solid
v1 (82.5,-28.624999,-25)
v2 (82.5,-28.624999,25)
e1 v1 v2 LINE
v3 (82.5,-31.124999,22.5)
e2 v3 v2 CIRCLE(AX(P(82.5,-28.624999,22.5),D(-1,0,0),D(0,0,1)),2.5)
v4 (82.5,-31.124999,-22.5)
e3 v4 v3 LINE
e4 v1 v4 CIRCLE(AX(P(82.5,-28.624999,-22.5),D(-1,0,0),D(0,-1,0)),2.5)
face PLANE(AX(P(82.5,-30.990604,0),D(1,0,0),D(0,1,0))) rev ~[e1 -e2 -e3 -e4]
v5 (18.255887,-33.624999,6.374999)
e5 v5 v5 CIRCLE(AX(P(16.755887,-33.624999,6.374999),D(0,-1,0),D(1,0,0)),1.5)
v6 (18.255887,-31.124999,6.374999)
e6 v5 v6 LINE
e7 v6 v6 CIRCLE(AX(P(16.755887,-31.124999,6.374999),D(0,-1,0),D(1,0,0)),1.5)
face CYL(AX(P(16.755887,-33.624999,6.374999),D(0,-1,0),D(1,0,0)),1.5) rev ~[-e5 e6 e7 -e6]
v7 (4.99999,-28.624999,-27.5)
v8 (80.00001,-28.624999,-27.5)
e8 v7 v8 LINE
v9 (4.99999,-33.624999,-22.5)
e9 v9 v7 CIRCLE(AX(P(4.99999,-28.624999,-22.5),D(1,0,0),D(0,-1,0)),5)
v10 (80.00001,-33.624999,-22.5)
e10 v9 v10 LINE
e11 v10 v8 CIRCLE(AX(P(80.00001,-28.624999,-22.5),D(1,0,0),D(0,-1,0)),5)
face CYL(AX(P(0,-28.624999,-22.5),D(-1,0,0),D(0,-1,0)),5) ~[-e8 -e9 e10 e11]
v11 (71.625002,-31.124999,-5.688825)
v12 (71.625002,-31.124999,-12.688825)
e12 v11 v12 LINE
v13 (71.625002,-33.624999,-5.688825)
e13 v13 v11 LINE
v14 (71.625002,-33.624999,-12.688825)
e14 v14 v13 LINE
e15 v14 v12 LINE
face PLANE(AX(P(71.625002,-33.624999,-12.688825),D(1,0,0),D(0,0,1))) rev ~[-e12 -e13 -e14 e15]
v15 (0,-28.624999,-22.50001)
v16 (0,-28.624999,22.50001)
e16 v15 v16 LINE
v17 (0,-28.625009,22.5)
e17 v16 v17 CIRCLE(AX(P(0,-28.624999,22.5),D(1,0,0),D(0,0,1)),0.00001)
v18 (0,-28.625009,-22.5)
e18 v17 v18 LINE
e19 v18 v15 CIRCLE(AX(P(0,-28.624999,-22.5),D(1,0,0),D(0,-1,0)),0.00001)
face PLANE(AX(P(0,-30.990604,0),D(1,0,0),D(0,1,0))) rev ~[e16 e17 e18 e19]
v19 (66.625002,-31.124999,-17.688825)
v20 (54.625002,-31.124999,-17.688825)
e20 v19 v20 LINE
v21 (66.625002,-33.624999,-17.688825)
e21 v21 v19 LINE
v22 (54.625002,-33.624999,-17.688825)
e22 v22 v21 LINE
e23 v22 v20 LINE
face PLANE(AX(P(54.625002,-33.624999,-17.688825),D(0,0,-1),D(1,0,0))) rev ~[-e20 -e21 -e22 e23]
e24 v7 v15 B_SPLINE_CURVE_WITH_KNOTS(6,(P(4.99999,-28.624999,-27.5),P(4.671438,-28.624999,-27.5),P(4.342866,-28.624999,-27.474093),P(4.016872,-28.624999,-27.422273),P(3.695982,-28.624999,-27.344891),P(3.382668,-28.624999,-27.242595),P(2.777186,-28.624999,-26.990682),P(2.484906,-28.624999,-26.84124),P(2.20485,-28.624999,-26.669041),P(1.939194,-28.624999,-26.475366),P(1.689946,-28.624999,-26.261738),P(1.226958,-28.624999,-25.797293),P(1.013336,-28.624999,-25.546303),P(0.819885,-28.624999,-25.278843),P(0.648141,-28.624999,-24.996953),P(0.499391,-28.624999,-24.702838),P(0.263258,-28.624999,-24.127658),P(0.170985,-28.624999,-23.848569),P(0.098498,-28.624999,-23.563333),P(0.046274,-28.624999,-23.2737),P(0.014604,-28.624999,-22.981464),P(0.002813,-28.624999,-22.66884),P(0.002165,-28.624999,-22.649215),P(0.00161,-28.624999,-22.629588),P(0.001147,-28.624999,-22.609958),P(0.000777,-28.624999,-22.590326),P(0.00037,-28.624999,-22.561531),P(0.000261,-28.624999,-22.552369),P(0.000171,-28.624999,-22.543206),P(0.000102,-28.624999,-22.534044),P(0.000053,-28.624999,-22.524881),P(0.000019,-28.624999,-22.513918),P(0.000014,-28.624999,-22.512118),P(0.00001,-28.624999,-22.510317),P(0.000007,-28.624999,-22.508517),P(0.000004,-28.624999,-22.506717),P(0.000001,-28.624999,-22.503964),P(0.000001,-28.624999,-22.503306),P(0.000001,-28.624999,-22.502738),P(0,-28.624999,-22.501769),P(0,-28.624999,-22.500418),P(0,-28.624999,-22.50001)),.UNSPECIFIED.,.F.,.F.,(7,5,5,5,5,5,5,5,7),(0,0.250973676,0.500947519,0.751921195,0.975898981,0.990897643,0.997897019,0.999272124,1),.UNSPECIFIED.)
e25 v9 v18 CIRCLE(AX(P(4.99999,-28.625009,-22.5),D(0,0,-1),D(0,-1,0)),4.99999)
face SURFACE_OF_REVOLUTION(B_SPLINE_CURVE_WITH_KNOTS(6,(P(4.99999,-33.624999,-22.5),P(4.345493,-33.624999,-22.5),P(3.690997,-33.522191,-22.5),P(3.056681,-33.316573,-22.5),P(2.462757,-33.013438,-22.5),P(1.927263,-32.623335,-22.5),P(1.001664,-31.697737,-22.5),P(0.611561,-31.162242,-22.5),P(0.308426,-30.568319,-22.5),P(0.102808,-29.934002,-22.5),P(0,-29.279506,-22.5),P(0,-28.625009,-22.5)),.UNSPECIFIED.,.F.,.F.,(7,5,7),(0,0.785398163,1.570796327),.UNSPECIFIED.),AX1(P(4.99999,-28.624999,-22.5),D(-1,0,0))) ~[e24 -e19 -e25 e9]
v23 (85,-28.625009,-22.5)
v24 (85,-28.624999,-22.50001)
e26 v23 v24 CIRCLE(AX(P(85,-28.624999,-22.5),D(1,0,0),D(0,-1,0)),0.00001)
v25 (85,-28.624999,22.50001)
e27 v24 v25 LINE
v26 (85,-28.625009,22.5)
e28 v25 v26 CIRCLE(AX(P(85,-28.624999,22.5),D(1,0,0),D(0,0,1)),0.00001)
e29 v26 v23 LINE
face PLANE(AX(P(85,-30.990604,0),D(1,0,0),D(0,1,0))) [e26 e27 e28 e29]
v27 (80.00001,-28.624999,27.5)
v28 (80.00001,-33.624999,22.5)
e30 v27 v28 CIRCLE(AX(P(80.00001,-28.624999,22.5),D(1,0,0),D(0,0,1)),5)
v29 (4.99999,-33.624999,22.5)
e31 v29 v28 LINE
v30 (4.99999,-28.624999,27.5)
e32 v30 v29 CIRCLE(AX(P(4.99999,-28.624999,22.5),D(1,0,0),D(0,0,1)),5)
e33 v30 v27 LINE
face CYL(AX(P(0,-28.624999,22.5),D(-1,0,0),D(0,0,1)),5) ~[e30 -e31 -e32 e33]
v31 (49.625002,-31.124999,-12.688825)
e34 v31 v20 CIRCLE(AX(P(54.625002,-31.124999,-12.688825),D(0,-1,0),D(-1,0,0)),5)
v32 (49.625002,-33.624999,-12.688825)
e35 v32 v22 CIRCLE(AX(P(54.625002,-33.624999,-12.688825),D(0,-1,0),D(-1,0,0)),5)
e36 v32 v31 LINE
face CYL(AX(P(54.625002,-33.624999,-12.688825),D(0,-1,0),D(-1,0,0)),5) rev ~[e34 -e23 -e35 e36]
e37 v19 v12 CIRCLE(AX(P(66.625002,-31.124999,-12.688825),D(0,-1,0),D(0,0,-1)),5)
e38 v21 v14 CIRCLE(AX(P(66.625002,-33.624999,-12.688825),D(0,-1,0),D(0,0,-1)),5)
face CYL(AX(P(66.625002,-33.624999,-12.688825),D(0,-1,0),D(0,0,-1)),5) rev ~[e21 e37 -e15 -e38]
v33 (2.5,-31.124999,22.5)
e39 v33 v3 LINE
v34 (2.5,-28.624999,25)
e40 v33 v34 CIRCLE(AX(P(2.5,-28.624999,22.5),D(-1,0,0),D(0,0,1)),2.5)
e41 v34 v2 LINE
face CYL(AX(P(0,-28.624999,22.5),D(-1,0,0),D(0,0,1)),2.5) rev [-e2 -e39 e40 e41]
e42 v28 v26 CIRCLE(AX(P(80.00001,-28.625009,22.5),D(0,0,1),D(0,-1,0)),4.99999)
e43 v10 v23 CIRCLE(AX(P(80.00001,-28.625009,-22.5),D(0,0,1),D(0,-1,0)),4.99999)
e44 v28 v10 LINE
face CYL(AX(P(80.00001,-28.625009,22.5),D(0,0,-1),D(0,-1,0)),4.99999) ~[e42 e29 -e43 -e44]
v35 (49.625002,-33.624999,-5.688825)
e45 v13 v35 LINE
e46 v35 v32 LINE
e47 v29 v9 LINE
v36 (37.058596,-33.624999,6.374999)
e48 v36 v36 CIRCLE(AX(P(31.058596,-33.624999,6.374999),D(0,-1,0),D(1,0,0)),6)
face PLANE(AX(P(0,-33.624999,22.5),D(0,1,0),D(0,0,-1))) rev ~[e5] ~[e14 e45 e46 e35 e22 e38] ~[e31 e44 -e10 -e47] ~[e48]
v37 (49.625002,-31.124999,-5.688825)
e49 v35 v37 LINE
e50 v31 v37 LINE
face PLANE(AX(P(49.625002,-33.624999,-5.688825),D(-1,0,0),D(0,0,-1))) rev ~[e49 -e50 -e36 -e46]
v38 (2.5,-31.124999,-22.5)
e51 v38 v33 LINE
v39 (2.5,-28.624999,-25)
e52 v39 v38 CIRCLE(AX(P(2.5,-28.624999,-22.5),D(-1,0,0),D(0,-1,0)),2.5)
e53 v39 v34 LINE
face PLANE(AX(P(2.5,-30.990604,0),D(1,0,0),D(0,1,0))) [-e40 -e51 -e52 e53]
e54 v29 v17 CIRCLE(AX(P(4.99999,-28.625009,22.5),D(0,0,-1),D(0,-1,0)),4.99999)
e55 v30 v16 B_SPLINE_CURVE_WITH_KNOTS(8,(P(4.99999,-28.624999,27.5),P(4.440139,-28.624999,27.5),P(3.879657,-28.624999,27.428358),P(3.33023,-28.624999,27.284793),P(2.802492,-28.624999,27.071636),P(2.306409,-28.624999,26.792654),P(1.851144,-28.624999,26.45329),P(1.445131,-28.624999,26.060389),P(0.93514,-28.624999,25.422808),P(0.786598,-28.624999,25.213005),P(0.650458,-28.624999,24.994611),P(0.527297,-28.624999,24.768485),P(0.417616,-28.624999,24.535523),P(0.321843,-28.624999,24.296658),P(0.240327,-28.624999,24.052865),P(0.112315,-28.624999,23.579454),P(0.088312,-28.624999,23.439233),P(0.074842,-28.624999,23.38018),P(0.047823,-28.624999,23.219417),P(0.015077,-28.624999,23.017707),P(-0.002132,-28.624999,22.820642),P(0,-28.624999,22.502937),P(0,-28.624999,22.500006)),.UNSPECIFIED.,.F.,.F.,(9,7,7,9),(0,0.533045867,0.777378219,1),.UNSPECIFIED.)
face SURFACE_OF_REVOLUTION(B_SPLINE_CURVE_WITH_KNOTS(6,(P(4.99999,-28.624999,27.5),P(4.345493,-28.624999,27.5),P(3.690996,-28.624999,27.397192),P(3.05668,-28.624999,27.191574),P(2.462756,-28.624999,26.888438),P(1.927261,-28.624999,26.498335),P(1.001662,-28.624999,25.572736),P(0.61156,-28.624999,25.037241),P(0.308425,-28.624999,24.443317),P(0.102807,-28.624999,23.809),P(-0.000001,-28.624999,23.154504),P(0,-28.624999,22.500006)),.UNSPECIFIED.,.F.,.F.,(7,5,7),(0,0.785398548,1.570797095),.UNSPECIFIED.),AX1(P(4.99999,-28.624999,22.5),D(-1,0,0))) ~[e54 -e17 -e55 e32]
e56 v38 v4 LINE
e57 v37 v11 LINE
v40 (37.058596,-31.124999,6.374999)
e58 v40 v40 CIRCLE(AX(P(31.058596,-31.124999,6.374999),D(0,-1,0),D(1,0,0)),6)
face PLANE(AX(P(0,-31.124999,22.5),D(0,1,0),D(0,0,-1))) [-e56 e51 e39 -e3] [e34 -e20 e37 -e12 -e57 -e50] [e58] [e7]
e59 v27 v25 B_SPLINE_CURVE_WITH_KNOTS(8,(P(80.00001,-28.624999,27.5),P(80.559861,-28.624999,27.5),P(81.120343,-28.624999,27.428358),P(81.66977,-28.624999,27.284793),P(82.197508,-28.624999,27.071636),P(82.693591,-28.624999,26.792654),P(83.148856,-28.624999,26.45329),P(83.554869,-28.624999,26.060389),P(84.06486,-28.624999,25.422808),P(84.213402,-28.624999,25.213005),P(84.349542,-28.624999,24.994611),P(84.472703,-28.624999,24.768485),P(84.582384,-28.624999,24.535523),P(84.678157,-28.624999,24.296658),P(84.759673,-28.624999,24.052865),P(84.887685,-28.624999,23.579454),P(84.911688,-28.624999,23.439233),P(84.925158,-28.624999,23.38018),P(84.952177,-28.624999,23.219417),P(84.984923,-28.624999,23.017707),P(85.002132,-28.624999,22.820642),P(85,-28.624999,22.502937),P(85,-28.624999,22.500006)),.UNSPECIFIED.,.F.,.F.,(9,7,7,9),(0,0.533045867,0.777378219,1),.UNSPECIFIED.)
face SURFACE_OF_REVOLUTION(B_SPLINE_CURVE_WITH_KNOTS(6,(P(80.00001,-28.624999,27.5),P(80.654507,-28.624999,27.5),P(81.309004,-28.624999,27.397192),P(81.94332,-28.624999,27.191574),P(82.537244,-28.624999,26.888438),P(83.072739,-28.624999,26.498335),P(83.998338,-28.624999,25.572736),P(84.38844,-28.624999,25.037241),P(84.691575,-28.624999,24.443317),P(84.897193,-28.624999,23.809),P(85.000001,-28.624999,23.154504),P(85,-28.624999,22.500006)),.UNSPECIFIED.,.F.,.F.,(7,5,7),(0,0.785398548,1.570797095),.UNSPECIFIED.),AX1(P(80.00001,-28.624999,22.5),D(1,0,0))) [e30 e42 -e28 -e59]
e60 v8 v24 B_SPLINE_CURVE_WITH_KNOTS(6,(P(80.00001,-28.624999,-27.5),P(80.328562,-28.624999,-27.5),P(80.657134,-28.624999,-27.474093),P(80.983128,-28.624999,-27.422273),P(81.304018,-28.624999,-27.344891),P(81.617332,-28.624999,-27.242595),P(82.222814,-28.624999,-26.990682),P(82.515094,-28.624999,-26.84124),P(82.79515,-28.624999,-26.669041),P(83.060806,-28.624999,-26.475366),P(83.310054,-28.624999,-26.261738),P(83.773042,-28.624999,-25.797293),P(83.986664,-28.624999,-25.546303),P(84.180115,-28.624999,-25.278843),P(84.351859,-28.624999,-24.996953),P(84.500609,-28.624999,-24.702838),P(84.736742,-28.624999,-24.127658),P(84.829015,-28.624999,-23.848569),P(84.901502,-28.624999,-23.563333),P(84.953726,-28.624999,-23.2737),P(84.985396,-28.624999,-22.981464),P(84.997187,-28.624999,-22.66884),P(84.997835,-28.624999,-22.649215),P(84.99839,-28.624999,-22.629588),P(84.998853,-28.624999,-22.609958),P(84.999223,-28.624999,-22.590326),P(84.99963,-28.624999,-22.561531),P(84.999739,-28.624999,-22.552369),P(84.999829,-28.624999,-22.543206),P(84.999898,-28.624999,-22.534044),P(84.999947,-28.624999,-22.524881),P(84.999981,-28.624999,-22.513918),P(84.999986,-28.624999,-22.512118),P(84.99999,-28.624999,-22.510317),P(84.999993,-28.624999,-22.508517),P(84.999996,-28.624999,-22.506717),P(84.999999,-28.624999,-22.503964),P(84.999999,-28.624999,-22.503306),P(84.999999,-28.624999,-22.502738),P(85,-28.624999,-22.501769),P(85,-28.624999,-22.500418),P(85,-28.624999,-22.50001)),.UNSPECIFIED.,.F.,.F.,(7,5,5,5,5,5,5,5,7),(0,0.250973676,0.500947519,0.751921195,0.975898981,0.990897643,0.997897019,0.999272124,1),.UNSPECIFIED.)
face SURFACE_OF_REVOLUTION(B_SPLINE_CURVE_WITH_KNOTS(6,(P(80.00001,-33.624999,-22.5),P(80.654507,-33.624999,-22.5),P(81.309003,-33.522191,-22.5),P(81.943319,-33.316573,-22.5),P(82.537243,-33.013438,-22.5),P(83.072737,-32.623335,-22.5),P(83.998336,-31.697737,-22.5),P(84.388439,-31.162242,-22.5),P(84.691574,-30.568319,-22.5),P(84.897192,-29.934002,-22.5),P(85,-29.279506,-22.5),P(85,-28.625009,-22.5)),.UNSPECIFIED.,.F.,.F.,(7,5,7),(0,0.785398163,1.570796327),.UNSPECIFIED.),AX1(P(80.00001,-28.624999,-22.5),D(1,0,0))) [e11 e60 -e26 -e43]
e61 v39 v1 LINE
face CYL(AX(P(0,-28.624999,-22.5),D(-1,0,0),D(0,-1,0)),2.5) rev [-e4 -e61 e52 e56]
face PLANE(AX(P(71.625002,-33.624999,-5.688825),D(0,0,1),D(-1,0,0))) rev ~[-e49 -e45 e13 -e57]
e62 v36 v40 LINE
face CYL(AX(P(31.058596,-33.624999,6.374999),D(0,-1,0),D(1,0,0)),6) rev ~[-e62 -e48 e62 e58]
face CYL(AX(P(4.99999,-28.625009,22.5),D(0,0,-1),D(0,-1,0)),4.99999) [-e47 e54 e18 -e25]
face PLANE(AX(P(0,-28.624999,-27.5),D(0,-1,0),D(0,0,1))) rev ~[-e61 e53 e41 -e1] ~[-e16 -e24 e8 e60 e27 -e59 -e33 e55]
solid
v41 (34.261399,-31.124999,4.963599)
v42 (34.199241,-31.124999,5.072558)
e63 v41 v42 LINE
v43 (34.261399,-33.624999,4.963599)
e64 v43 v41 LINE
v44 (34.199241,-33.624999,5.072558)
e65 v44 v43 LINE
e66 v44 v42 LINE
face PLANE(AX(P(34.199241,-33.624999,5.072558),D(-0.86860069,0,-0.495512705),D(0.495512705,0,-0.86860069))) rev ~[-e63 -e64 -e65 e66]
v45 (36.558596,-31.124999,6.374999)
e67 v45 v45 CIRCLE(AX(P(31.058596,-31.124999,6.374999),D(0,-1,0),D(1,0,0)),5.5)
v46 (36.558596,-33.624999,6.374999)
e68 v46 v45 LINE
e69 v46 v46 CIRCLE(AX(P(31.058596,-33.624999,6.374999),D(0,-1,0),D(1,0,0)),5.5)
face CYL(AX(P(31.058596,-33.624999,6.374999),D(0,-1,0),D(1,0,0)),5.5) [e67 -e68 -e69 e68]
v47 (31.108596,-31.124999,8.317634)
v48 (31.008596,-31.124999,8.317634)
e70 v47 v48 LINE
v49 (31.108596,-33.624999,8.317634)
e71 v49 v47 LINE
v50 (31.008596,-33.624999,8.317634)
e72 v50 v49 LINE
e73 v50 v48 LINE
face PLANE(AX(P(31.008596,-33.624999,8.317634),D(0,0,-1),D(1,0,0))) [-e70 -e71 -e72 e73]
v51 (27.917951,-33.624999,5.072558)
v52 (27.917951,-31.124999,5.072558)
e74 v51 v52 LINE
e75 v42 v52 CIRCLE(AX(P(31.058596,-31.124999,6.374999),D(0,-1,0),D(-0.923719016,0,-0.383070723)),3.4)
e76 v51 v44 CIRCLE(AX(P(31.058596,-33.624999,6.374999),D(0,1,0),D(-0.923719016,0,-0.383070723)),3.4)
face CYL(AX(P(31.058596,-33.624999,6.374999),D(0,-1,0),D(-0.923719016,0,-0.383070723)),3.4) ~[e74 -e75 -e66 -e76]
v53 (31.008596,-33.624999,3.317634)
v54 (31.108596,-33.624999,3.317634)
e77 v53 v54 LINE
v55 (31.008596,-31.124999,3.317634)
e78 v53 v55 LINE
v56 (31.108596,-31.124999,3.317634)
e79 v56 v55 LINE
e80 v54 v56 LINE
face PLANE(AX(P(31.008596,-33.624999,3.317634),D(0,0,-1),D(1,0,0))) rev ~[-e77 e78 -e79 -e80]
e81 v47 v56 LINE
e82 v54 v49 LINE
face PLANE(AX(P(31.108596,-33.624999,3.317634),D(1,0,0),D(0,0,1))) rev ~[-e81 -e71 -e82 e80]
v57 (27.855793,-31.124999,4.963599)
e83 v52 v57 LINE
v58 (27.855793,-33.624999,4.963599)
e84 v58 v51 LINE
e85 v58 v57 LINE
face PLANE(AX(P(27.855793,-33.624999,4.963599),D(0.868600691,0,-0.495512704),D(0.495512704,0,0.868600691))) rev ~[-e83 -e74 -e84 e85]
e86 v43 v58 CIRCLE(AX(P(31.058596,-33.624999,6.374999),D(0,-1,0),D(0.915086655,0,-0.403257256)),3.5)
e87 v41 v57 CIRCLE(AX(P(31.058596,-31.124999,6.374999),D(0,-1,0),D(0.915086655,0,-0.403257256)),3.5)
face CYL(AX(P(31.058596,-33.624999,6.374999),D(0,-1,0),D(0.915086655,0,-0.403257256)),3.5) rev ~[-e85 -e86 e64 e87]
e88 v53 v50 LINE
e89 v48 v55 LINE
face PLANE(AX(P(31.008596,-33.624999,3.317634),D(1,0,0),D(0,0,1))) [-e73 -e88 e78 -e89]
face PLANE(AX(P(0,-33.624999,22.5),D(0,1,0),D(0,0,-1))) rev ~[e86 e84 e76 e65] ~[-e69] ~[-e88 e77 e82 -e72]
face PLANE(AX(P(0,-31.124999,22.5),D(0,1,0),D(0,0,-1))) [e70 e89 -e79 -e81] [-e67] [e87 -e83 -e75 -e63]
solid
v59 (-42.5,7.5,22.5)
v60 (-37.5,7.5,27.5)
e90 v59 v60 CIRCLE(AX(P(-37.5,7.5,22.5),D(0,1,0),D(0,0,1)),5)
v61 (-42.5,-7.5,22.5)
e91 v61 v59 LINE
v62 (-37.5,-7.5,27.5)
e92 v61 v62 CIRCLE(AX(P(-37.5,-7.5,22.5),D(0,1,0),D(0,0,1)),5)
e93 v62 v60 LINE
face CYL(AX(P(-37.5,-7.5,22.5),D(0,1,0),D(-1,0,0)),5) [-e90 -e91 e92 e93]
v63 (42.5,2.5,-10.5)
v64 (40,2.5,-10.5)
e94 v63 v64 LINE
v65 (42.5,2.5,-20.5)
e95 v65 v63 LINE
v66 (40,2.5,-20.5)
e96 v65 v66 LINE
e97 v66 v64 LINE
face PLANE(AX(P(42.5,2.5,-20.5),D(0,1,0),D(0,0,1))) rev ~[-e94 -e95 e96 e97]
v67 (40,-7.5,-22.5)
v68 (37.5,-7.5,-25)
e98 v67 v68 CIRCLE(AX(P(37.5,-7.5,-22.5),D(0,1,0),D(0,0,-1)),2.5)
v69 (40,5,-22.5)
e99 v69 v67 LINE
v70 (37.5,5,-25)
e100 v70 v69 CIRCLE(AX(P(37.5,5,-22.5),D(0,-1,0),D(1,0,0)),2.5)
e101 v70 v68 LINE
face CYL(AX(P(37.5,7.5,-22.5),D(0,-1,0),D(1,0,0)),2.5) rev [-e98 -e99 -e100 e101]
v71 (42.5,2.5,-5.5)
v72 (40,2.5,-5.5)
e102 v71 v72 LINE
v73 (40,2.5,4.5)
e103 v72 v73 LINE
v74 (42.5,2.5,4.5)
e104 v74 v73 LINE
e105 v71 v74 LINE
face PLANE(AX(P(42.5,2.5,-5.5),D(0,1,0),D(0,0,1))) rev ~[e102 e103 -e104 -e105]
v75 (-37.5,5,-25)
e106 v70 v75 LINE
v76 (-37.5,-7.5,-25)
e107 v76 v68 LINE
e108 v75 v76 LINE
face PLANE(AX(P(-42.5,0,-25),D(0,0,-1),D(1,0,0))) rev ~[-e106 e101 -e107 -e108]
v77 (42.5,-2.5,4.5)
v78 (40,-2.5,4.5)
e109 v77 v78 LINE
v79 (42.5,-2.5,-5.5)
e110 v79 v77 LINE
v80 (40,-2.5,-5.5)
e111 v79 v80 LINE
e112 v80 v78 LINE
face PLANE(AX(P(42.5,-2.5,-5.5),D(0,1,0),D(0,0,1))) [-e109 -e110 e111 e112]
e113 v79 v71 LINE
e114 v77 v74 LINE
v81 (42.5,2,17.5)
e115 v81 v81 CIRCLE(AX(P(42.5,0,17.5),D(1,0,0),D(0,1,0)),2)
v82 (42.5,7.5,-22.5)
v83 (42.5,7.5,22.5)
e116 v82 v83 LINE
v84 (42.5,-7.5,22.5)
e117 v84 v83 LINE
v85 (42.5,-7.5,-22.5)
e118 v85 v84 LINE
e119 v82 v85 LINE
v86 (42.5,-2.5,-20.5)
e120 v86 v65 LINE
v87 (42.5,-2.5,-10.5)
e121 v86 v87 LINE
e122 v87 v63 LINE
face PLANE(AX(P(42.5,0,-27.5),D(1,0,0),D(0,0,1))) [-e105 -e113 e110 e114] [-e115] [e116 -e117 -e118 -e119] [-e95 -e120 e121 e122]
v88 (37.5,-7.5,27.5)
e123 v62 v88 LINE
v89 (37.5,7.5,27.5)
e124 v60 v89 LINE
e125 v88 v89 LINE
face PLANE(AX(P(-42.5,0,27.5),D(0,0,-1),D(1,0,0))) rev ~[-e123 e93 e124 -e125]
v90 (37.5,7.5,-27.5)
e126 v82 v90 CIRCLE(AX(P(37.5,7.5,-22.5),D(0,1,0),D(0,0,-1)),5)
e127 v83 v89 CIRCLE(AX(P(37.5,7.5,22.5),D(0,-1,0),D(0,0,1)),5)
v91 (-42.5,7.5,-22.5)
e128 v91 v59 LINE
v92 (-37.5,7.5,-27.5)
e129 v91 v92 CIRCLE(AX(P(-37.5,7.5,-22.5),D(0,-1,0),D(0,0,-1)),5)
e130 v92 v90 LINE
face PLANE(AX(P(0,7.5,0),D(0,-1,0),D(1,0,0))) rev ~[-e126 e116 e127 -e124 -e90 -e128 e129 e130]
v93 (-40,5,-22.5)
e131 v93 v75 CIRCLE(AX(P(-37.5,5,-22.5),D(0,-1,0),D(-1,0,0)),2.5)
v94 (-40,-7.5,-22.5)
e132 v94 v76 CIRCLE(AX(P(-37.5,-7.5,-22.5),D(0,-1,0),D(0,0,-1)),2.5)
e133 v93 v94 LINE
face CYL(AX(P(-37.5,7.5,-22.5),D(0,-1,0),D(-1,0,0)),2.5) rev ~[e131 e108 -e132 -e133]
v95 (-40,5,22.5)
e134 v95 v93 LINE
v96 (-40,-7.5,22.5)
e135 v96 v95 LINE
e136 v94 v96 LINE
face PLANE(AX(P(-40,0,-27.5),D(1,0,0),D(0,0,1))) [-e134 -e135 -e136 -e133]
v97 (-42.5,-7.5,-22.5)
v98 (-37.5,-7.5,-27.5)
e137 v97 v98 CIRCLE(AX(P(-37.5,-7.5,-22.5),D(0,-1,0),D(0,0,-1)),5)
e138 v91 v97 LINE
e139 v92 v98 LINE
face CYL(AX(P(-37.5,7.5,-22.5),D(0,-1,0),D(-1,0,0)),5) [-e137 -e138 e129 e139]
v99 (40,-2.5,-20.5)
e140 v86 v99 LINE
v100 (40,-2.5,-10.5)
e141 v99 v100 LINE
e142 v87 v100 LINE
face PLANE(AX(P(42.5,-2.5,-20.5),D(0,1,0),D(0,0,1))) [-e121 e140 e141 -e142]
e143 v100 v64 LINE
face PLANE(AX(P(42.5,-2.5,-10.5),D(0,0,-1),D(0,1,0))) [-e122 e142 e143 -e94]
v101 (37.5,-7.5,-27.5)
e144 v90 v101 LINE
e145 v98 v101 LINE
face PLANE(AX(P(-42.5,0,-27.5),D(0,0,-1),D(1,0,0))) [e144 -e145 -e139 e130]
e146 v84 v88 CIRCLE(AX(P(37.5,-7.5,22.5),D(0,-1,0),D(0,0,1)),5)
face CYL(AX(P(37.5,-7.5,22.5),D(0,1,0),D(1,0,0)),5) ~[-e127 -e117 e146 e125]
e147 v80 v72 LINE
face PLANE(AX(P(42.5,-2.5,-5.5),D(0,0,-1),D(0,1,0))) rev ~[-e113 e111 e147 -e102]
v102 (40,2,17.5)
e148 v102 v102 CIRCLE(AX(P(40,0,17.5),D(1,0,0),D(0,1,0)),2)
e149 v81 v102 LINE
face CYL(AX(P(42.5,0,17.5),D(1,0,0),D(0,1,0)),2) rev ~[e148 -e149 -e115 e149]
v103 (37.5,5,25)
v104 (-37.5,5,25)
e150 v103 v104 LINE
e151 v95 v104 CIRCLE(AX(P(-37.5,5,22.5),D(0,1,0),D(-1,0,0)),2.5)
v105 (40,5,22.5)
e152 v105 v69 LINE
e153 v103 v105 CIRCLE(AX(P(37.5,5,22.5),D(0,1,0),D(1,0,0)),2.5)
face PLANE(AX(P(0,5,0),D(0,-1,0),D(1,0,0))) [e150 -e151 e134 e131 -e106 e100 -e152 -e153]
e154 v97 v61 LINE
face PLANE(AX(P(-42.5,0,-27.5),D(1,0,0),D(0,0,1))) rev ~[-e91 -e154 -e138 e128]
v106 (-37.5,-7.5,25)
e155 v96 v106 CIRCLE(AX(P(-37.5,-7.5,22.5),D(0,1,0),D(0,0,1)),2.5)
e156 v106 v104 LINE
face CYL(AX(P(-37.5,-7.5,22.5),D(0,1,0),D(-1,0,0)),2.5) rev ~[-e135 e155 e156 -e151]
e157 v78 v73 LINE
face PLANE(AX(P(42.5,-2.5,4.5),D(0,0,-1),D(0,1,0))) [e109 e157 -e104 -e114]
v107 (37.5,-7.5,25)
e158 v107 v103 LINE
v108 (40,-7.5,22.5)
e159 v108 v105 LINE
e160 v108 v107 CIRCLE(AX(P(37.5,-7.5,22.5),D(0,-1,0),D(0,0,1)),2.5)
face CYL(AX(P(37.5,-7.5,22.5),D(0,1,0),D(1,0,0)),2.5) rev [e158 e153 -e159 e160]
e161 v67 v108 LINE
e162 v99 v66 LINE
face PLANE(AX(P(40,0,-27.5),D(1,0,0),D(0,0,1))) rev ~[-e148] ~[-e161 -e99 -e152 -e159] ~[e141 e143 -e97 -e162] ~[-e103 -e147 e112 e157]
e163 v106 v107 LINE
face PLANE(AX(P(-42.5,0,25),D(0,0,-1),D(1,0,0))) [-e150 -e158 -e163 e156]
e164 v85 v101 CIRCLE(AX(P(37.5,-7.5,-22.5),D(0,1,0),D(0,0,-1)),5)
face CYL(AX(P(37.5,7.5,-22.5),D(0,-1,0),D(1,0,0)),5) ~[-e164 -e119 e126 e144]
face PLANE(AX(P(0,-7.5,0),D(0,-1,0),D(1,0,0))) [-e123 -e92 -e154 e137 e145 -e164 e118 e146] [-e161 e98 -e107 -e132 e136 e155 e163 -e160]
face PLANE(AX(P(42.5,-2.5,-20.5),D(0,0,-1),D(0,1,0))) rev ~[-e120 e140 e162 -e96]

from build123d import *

# Parameters (mm, degrees)
F0_W      = 85
F0_H      = 55
F1_DEPTH  = 7.5
F2_R      = 5
F3_T      = -2.5
F4_W      = 5
F4_H      = 10
F5_DEPTH  = 25
F6_R      = 2
F7_DEPTH  = 25
F9_DEPTH  = 85
F10_T     = -2.5
F11_R     = 6
F11_R_2   = 5.5
F11_R_3   = 1.5
F12_DEPTH = 25
F14_DEPTH = 25
F15_W     = 0.1
F15_H     = 5
F16_DEPTH = 25
F17_R     = 4.99999


# Not quite as in the source:
# - a fillet or chamfer is up to 0.001 mm smaller than in the source, because OpenCascade refuses the exact size


with BuildPart() as f1:
    # F0 (on Front) → F1 (new body, symmetric)
    with BuildSketch(Plane.XZ):
        Rectangle(F0_W, F0_H)
    extrude(amount=F1_DEPTH, both=True)

    # F2
    f2_edges = [f1.edges().sort_by_distance(p)[0] for p in [
        (-42.5, 0, 27.5),
        (42.5, 0, 27.5),
        (42.5, 0, -27.5),
        (-42.5, 0, -27.5),
    ]]
    fillet(f2_edges, radius=F2_R)

    # F3
    f3_openings = [f1.faces().sort_by_distance(p)[0] for p in [
        (0, -7.5, 0),
    ]]
    offset(amount=F3_T, openings=f3_openings)

    # F4 (on face) → F5 (cut)
    with BuildSketch(Plane.YZ.offset(42.5)):
        with Locations((0, -15.5)):
            Rectangle(F4_W, F4_H)
        with Locations((0, -0.5)):
            Rectangle(F4_W, F4_H)
    extrude(amount=-F5_DEPTH, mode=Mode.SUBTRACT)

    # F6 (on face) → F7 (cut)
    with BuildSketch(Plane.YZ.offset(42.5)):
        with Locations((0, 17.5)):
            Circle(F6_R)
    extrude(amount=-F7_DEPTH, mode=Mode.SUBTRACT)


with BuildPart() as f9:
    # F8 (on Right) → F9 (new body)
    with BuildSketch(Plane.YZ):
        with BuildLine():
            Line((-28.6249992251, -27.5), (-28.6249992251, 27.5))
            ThreePointArc((-28.6249992251, 27.5), (-32.1605331311, 26.0355339059), (-33.6249992251, 22.5))
            Line((-33.6249992251, 22.5), (-33.6249992251, -22.5))
            ThreePointArc((-33.6249992251, -22.5), (-32.1605331311, -26.0355339059), (-28.6249992251, -27.5))
        make_face()
    extrude(amount=F9_DEPTH)

    # F10
    f10_openings = [f9.faces().sort_by_distance(p)[0] for p in [
        (42.5, -28.624999, 0),
    ]]
    offset(amount=F10_T, openings=f10_openings)

    # F11 (on face) → F12 (cut)
    with BuildSketch(Plane.XZ.offset(33.6249992251)):
        with Locations((31.0585959434, 6.3749989495)):
            Circle(F11_R)
        with Locations((31.0585959434, 6.3749989495)):
            Circle(F11_R_2, mode=Mode.SUBTRACT)
        with Locations((16.7558868038, 6.3749989495)):
            Circle(F11_R_3)
    extrude(amount=-F12_DEPTH, mode=Mode.SUBTRACT)

    # F13 (on face) → F14 (cut)
    with BuildSketch(Plane.XZ.offset(33.6249992251)):
        with BuildLine():
            Line((71.6250017881, -5.6888253678), (49.6250017881, -5.6888253678))
            Line((49.6250017881, -5.6888253678), (49.6250017881, -12.6888253678))
            ThreePointArc((49.6250017881, -12.6888253678), (51.0894678822, -16.2243592737), (54.6250017881, -17.6888253678))
            Line((54.6250017881, -17.6888253678), (66.6250017881, -17.6888253678))
            ThreePointArc((66.6250017881, -17.6888253678), (70.1605356941, -16.2243592737), (71.6250017881, -12.6888253678))
            Line((71.6250017881, -12.6888253678), (71.6250017881, -5.6888253678))
        make_face()
    extrude(amount=-F14_DEPTH, mode=Mode.SUBTRACT)

    # F15 (on face) → F16 (cut)
    with BuildSketch(Plane.XZ.offset(33.6249992251)):
        with BuildLine():
            Line((34.1992405995, 5.0725584924), (34.261399235, 4.9635985542))
            ThreePointArc((34.261399235, 4.9635985542), (31.0585959434, 9.8749989495), (27.8557926519, 4.9635985542))
            Line((27.8557926519, 4.9635985542), (27.9179512873, 5.0725584924))
            ThreePointArc((27.9179512873, 5.0725584924), (31.0585959434, 9.7749989495), (34.1992405995, 5.0725584924))
        make_face()
        with Locations((31.0585959434, 5.8176338766)):
            Rectangle(F15_W, F15_H)
    extrude(amount=-F16_DEPTH, mode=Mode.SUBTRACT)

    # F17 (radius 5 in the source; OpenCascade refuses exactly that, so slightly less here)
    f17_edges = [f9.edges().sort_by_distance(p)[0] for p in [
        (0, -32.160533, 26.035534),
        (85, -33.624999, 0),
    ]]
    fillet(f17_edges, radius=F17_R)


solid = Compound([f1.part, f9.part])
